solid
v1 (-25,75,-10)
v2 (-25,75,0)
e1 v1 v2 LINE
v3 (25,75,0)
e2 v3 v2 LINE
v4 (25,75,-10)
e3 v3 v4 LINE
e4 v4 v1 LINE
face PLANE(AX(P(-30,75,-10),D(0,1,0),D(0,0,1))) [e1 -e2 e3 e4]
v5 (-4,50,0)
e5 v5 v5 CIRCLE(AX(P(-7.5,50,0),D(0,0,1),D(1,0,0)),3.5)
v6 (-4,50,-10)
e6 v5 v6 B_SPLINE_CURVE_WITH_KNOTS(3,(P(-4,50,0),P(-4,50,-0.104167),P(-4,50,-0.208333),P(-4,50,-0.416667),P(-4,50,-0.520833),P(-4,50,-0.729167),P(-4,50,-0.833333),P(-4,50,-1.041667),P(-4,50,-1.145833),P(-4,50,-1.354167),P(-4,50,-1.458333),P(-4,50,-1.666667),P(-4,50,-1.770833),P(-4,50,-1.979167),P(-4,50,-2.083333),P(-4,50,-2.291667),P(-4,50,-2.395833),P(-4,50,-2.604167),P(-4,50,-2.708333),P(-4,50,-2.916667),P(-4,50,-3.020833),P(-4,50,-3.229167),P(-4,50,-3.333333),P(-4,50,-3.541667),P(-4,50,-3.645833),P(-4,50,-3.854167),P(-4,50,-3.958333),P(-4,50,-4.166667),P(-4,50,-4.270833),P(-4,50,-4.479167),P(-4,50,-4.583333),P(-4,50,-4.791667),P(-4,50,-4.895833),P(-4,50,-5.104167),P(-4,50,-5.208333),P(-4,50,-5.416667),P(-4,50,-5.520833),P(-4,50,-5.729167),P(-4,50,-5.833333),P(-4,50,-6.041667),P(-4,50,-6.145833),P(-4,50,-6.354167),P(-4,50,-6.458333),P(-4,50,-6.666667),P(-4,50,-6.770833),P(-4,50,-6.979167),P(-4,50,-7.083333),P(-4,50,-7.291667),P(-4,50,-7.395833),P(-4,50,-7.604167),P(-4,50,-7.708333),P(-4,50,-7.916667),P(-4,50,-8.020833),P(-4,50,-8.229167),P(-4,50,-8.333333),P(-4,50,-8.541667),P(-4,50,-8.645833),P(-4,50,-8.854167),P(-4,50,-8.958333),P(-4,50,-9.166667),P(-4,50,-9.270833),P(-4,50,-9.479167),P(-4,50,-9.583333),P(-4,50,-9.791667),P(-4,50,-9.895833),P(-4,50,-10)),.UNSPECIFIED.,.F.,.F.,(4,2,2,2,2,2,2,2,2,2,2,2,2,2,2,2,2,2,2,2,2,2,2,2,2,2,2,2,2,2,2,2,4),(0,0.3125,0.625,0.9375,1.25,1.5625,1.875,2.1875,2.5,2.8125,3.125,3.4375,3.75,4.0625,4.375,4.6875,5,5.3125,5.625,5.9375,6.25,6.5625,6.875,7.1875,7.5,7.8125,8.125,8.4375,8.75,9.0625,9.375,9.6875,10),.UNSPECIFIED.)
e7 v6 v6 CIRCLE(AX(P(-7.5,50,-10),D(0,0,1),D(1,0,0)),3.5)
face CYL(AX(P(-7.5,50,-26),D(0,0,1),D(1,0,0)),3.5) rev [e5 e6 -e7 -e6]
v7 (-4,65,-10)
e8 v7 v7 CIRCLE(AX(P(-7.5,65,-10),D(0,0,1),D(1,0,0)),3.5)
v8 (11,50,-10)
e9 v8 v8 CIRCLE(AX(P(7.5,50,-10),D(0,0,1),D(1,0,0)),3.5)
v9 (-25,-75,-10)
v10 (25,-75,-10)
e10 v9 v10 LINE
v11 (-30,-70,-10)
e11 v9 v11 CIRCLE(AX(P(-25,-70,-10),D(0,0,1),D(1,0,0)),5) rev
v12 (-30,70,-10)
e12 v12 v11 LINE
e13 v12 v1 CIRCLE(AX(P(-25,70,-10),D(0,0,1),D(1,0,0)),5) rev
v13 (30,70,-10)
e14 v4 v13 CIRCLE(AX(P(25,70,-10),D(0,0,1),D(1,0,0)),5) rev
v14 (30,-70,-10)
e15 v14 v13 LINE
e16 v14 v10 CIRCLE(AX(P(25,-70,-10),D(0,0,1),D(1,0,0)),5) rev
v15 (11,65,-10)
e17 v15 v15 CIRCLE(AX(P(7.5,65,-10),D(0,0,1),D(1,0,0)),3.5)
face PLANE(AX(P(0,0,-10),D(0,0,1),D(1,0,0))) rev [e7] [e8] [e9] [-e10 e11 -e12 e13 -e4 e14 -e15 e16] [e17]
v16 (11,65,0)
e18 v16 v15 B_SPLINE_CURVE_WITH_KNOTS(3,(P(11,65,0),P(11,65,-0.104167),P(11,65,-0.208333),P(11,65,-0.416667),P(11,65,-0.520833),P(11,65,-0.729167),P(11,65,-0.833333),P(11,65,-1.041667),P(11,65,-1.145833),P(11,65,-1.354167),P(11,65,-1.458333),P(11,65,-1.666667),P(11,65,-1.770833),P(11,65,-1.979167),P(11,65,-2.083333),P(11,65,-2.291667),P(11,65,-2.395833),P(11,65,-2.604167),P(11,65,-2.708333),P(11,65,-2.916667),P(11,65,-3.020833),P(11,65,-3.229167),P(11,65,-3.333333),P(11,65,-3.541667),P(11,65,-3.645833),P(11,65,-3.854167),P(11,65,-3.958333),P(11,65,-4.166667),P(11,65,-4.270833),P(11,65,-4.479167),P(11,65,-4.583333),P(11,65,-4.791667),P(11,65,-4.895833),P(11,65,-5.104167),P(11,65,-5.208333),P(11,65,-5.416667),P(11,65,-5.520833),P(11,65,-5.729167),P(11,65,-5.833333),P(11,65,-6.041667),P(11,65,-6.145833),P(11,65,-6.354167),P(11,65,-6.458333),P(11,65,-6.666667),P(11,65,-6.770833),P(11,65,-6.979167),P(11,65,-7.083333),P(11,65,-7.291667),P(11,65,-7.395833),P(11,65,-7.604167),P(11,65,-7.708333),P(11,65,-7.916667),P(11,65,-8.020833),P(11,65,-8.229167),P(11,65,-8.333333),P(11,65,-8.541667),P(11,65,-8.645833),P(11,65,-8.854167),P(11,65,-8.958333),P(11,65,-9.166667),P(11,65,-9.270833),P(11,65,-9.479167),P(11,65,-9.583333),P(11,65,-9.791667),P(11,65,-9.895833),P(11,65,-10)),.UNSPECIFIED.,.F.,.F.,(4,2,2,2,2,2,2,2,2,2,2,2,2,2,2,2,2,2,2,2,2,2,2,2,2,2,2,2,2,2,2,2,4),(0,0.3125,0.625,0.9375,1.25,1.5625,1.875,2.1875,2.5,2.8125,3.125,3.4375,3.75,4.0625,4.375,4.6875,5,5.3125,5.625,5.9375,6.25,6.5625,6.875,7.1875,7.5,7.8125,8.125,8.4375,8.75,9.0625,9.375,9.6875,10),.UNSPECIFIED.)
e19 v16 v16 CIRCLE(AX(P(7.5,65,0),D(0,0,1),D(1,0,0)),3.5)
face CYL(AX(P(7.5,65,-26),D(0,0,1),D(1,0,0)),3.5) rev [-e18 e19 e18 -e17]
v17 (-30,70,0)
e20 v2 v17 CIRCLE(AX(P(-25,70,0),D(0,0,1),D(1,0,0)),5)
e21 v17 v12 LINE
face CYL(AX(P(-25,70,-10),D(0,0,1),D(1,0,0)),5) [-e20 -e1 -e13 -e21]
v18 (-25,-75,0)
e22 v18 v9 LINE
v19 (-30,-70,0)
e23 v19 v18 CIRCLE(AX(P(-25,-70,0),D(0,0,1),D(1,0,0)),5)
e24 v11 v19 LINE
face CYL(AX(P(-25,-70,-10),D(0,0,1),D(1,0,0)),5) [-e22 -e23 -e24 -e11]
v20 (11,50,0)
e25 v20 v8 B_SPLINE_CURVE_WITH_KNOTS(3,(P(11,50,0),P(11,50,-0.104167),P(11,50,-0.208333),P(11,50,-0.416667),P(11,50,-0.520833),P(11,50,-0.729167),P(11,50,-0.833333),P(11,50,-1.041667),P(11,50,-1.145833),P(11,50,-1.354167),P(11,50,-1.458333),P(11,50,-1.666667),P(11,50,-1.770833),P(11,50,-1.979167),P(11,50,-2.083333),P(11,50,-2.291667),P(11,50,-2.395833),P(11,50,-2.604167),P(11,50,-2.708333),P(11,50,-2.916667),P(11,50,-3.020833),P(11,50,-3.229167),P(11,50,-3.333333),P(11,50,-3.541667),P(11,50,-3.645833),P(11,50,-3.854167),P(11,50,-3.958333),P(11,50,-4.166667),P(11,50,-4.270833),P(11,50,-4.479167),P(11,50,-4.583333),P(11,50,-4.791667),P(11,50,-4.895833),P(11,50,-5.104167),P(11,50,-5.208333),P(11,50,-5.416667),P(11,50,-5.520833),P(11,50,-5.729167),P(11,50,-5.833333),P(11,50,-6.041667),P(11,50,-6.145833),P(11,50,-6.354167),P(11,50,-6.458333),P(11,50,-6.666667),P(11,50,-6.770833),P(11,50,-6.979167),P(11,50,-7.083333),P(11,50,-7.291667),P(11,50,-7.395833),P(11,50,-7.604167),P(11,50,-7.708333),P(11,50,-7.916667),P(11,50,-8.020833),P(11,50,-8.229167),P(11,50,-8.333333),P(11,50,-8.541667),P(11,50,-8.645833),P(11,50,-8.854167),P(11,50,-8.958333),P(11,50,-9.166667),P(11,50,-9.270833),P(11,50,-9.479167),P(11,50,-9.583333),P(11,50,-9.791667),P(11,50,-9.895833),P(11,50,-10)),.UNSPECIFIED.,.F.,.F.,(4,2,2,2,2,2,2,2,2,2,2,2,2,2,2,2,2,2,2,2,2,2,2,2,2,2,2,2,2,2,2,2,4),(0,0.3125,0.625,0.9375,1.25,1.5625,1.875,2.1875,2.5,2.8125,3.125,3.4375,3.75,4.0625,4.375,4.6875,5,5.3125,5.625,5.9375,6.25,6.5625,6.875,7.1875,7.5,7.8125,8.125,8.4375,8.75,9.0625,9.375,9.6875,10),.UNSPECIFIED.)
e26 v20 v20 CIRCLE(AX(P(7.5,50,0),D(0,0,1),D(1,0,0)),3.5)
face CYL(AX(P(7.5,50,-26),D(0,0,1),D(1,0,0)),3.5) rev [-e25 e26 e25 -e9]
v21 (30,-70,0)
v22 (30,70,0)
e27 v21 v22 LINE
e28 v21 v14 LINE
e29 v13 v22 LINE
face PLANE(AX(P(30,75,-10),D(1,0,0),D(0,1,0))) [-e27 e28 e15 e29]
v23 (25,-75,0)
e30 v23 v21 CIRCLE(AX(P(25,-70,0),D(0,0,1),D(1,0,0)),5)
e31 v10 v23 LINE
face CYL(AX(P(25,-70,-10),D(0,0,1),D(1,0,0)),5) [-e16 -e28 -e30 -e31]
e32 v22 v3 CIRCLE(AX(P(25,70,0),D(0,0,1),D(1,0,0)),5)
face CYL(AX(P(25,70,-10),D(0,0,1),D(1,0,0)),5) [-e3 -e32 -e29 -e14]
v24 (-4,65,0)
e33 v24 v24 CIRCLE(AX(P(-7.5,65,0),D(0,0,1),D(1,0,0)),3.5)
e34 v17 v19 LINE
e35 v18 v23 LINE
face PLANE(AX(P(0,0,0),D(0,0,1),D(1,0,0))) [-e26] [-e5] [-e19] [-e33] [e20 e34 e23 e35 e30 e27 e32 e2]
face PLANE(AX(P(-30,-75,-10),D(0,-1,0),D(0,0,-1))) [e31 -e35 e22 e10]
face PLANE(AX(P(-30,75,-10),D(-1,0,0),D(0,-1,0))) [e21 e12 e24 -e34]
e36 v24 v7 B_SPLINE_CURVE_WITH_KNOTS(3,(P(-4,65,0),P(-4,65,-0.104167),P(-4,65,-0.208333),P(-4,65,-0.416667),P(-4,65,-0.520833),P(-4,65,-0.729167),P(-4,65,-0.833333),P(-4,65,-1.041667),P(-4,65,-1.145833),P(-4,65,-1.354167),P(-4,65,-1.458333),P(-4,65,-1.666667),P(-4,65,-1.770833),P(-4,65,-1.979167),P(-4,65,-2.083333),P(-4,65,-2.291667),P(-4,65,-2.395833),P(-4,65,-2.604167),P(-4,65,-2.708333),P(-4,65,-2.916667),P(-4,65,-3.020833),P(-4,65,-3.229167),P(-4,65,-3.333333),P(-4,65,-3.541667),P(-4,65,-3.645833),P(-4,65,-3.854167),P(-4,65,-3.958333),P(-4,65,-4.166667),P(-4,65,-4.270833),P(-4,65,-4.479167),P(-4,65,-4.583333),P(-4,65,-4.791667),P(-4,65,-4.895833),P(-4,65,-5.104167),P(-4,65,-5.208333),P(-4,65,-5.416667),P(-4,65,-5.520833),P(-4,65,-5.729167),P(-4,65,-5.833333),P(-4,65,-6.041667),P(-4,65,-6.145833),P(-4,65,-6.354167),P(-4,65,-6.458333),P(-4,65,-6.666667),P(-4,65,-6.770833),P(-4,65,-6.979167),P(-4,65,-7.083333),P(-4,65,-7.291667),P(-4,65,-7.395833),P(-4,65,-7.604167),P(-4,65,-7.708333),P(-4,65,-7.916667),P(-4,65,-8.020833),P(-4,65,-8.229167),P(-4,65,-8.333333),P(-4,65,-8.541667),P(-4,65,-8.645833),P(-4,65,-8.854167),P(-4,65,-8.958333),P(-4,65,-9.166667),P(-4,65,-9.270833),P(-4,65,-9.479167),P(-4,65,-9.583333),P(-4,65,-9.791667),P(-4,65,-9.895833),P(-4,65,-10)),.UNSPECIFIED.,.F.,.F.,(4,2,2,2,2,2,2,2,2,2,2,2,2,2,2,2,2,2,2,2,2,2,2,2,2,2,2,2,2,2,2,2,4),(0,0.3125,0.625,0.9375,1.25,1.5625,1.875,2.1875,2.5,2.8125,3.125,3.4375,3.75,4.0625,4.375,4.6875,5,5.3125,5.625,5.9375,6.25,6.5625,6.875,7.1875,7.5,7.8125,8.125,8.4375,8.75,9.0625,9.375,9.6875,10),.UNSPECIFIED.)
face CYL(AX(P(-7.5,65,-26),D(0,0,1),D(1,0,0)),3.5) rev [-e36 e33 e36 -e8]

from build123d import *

# Parameters (mm, degrees)
IZIM1_W               = 60
IZIM1_H               = 150
TABAN_FLAN_1_DEPTH    = 10
IZIM6_R               = 3.5
KES_EKSTR_ZYON1_DEPTH = 26
RADYUS1_R             = 5


# Sheet-metal steps are written as plain solids
with BuildPart() as part:
    # Çizim1 → Taban-Flanş1 (new body)
    with BuildSketch(Plane.XY):
        Rectangle(IZIM1_W, IZIM1_H)
    extrude(amount=-TABAN_FLAN_1_DEPTH)

    # Çizim6 → Kes-Ekstrüzyon1 (cut)
    with BuildSketch(Plane.XY):
        with Locations((7.5, 65)):
            Circle(IZIM6_R)
        with Locations((-7.5, 65)):
            Circle(IZIM6_R)
        with Locations((7.5, 50)):
            Circle(IZIM6_R)
        with Locations((-7.5, 50)):
            Circle(IZIM6_R)
    extrude(amount=-KES_EKSTR_ZYON1_DEPTH, mode=Mode.SUBTRACT)

    # Radyus1
    radyus1_edges = [part.edges().sort_by_distance(p)[0] for p in [
        (30, -75, -5),
        (-30, -75, -5),
        (-30, 75, -5),
        (30, 75, -5),
    ]]
    fillet(radyus1_edges, radius=RADYUS1_R)


solid = part.part
